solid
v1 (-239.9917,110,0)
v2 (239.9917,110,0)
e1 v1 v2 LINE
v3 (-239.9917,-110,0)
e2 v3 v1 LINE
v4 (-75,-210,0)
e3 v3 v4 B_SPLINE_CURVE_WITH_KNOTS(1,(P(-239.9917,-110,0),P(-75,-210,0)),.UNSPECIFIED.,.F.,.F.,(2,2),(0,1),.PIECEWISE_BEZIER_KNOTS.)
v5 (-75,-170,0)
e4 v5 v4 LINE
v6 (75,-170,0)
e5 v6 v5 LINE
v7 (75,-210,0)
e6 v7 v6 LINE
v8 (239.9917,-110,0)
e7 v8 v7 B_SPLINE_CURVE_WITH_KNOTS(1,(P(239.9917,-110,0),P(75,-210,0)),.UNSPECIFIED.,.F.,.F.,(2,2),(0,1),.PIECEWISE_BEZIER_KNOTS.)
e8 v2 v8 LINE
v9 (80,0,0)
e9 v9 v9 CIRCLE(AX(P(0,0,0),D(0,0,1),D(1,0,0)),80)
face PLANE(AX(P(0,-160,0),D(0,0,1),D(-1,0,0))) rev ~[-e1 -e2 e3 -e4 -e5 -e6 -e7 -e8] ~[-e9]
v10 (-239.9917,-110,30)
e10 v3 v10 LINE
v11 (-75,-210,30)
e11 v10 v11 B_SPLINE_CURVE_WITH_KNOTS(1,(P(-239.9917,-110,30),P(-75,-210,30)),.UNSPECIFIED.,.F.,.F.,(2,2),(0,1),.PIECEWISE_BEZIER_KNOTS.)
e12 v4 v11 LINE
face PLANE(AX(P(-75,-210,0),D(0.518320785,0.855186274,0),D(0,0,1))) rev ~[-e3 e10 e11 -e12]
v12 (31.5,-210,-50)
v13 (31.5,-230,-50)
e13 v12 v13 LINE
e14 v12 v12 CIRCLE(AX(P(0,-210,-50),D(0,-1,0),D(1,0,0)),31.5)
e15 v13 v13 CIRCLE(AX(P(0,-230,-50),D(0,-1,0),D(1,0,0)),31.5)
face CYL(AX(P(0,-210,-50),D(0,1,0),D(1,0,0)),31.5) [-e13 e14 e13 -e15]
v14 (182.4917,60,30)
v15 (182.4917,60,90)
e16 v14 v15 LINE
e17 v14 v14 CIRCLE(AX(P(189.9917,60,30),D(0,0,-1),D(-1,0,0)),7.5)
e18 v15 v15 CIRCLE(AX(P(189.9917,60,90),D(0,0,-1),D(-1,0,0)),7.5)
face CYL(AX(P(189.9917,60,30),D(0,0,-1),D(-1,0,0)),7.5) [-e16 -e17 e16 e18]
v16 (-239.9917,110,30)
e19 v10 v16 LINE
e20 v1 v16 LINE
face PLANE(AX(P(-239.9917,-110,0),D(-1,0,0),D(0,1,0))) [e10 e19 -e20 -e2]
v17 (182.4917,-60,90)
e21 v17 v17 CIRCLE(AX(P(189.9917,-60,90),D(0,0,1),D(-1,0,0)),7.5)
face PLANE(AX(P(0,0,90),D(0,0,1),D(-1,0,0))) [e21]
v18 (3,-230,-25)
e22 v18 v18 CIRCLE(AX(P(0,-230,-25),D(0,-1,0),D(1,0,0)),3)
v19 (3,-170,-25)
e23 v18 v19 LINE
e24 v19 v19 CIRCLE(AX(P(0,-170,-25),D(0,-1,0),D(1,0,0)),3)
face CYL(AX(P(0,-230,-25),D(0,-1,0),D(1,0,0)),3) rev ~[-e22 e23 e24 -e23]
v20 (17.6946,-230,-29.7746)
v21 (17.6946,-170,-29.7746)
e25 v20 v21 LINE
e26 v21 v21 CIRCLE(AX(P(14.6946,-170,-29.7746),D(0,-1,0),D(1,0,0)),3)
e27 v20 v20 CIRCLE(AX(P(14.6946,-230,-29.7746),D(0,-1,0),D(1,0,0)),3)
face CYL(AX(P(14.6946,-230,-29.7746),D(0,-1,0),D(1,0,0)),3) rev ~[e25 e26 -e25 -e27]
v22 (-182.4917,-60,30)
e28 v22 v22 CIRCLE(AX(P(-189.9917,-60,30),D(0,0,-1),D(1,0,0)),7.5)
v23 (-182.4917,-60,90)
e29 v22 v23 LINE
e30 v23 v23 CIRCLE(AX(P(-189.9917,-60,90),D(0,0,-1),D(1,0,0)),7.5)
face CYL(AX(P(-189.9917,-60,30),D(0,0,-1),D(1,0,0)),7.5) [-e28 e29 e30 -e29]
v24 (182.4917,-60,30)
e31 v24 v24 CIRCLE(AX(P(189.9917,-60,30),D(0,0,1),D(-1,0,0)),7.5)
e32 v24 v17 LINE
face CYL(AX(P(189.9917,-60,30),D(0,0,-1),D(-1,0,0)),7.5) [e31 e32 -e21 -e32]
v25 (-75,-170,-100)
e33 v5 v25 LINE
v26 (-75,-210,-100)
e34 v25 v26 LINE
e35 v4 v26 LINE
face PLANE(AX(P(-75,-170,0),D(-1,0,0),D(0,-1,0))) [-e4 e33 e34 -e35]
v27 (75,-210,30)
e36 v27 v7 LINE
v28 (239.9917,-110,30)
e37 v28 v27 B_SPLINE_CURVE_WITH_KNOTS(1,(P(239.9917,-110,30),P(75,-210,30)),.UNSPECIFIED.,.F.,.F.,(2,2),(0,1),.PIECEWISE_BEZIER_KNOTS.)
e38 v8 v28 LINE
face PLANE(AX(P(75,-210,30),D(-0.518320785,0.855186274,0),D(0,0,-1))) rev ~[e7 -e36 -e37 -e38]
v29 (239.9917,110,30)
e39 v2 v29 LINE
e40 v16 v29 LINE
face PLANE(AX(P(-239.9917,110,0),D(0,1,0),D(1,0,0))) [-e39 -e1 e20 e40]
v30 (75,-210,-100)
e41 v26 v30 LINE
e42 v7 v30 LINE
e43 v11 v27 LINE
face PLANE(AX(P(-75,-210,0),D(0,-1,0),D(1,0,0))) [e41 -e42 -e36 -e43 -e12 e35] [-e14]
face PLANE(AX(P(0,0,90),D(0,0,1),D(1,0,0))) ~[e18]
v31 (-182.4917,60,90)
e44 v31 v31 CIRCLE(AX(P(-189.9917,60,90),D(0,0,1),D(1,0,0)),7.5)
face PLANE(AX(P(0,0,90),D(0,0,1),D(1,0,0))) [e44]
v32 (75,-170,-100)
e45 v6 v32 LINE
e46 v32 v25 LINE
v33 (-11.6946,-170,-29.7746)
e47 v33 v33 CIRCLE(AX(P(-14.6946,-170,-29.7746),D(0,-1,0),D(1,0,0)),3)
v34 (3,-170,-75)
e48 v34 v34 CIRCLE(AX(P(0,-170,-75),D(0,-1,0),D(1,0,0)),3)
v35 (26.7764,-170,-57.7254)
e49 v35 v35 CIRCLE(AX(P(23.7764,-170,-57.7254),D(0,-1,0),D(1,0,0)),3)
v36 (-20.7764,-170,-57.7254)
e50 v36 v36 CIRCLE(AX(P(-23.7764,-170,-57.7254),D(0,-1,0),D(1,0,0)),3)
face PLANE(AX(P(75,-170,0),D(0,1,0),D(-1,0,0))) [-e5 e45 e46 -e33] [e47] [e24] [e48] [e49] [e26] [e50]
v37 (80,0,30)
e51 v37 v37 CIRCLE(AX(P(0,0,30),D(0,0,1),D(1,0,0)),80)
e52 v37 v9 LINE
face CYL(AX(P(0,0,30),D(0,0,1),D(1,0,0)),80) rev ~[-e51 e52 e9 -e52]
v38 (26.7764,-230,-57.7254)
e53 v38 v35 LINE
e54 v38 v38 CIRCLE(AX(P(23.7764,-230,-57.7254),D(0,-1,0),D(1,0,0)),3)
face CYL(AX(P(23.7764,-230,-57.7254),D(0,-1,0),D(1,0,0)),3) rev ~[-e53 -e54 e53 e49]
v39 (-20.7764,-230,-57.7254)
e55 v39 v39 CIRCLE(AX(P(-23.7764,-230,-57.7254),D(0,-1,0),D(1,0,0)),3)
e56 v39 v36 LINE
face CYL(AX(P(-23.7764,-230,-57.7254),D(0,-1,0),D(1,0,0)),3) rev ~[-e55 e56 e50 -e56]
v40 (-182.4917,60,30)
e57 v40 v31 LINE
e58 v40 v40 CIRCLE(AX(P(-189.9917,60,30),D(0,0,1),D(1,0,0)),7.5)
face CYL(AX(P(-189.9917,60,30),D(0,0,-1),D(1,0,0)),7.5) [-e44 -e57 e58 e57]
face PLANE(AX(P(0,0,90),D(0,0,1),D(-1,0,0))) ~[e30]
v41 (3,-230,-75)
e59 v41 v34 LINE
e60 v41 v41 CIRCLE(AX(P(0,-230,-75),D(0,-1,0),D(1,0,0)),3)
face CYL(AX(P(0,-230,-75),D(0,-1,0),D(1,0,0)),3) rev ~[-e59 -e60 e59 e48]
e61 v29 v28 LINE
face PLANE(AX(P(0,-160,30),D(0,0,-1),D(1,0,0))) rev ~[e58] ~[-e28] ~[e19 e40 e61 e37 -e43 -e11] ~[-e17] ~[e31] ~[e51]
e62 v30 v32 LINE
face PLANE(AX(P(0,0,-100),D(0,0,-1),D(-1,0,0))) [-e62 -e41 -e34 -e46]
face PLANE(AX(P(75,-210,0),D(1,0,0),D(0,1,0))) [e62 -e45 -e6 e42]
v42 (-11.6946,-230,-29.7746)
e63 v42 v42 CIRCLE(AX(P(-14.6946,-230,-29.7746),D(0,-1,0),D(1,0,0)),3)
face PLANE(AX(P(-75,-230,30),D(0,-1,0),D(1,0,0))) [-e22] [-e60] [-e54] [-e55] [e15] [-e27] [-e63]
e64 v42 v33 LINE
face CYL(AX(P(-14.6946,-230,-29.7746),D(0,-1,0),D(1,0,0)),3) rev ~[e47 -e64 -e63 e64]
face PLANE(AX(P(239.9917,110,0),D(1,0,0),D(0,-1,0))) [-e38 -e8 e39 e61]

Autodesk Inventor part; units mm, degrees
ref_plane "YZ Plane" through (0, 0, 0) normal (1, 0, 0) x (0, 1, 0)
ref_plane "XZ Plane" through (0, 0, 0) normal (0, 1, 0) x (-1, 0, 0)
sketch "Boceto1" plane through (0, 0, 0) normal (0, 0, 1) x (1, 0, 0)
  circle A0 centre (0, 0) radius 264 construction
  line L0 (-239.9917, 110) -> (239.9917, 110)
  line L1 (239.9917, 110) -> (239.9917, -110)
  line L2 (239.9917, -110) -> (-239.9917, -110)
  line L3 (-239.9917, -110) -> (-239.9917, 110)
  line L4 (-239.9917, 110) -> (239.9917, -110) construction
  line L5 (239.9917, 110) -> (-239.9917, -110) construction
  dimension "d0" = 528
  dimension "d1" = 220
extrude "Extrusión1" add sketch "Boceto1" along normal blind 30
sketch "Boceto2" plane through (0, 0, 30) normal (0, 0, 1) x (1, 0, 0)
  circle A0 centre (-189.9917, 60) radius 7.5
  line L0 (239.9917, 110) -> (-239.9917, 110) construction
  line L1 (-239.9917, 110) -> (-239.9917, -110) construction
  point P0 (0, 0)
  dimension "d4" = 15
  dimension "d5" = 50
  dimension "d6" = 50
extrude "Extrusión2" add sketch "Boceto2" along normal blind 60
mirror "Simetría1" about plane through (0, 0, 0) normal (1, 0, 0) of "Extrusión2"
mirror "Simetría2" about plane through (0, 0, 0) normal (0, 1, 0) of "Extrusión2", "Simetría1"
sketch "Boceto3" plane through (0, 0, 30) normal (0, 0, 1) x (1, 0, 0)
  circle A0 centre (0, 0) radius 80
  dimension "d17" = 160
extrude "Extrusión3" cut sketch "Boceto3" along normal through all both and the other way through all
sketch "Boceto9" plane through (-239.9917, -110, 0) normal (0, -1, 0) x (1, 0, 0)
  line L0 (0, 30) -> (479.9833, 30) projected
  line L1 (479.9833, 0) -> (0, 0) projected
  line L2 (0, 30) -> (479.9833, 30)
  line L3 (479.9833, 30) -> (479.9833, 0)
  line L4 (479.9833, 0) -> (0, 0)
  line L5 (0, 0) -> (0, 30)
  point P0 (239.9917, 0)
ref_plane "Plano de trabajo1" through (-239.9917, -210, 0) normal (0, -1, 0) x (1, 0, 0)
sketch "Boceto10" plane through (-239.9917, -210, 0) normal (0, -1, 0) x (1, 0, 0)
  line L0 (0, 0) -> (479.9833, 0) construction
  line L1 (479.9833, 0) -> (479.9833, 30) construction
  line L2 (0, 30) -> (479.9833, 30) construction
  line L3 (0, 0) -> (0, 30) construction
  line L4 (164.9917, 30) -> (314.9917, 30)
  line L5 (314.9917, 30) -> (314.9917, 0)
  line L6 (314.9917, 0) -> (164.9917, 0)
  line L7 (164.9917, 0) -> (164.9917, 30)
  point P0 (239.9917, 0)
  point P1 (239.9917, 30)
  dimension "d41" = 150
  dimension "d42" = 30
loft "Solevación1" add profiles "Boceto10" section 1 edges at (0, -110, 0) (239.9917, -110, 15) (0, -110, 30) (-239.9917, -110, 15)
sketch "Boceto11" plane through (0, 0, 0) normal (0, 0, -1) x (-1, 0, 0)
  line L0 (75, -210) -> (-75, -210)
  line L1 (-75, -210) -> (-75, -170)
  line L2 (-75, -170) -> (75, -170)
  line L3 (75, -170) -> (75, -210)
  line L4 (-75, -210) -> (75, -210) projected
  point P0 (0, 0)
  point P1 (0, -210)
  dimension "d48" = 150
  dimension "d49" = 40
extrude "Extrusión8" add sketch "Boceto11" along normal blind 100
sketch "Boceto12" plane through (-75, -210, 30) normal (0, -1, 0) x (1, 0, 0)
  line L0 (150, -130) -> (0, -130) construction
  line L1 (0, -30) -> (0, 0) construction
  line L2 (150, -130) -> (0, -130) construction
  line L3 (0, -130) -> (0, -30) construction
  line L4 (0, -30) -> (150, -30) construction
  line L5 (150, -30) -> (150, -130) construction
  line L6 (150, 0) -> (150, -30) construction
  line L7 (150, -30) -> (0, -130) construction
  line L8 (0, -30) -> (150, -130) construction
  circle A0 centre (75, -80) radius 31.5
  point P0 (75, -30)
  dimension "d52" = 63
extrude "Extrusión9" add sketch "Boceto12" along normal blind 20
sketch "Boceto13" plane through (0, -230, -50) normal (0, -1, 0) x (1, 0, 0)
  circle A0 centre (0, 0) radius 25 construction
  circle A1 centre (0, 25) radius 3
  circle A2 centre (0, -25) radius 3
  circle A3 centre (23.7764, -7.7254) radius 3
  circle A4 centre (14.6946, 20.2254) radius 3
  circle A5 centre (-14.6946, 20.2254) radius 3
  circle A6 centre (-23.7764, -7.7254) radius 3
  point P0 (0, 50)
  dimension "d55" = 50
  dimension "d56" = 6
  dimension "d57" = 6
  dimension "d60" = 360
extrude "Extrusión10" cut sketch "Boceto13" against normal up to next
equation "\"d0\" = 0.8 * diametro_llanta"
equation "\"d1\" = 0.333333 * diametro_llanta"
equation "\"d2\" = espesor_soporte"
equation "\"d4\" = 0.5 * espesor_soporte"
equation "\"d7\" = 2 * espesor_soporte"
equation "\"d42\" = espesor_soporte"
equation "\"ancho_llanta\" = 271000"
equation "\"espesor_soporte\" = 30"
equation "\"diametro_llanta\" = 660"
properties part number "soporte" material "Acero inoxidable"
